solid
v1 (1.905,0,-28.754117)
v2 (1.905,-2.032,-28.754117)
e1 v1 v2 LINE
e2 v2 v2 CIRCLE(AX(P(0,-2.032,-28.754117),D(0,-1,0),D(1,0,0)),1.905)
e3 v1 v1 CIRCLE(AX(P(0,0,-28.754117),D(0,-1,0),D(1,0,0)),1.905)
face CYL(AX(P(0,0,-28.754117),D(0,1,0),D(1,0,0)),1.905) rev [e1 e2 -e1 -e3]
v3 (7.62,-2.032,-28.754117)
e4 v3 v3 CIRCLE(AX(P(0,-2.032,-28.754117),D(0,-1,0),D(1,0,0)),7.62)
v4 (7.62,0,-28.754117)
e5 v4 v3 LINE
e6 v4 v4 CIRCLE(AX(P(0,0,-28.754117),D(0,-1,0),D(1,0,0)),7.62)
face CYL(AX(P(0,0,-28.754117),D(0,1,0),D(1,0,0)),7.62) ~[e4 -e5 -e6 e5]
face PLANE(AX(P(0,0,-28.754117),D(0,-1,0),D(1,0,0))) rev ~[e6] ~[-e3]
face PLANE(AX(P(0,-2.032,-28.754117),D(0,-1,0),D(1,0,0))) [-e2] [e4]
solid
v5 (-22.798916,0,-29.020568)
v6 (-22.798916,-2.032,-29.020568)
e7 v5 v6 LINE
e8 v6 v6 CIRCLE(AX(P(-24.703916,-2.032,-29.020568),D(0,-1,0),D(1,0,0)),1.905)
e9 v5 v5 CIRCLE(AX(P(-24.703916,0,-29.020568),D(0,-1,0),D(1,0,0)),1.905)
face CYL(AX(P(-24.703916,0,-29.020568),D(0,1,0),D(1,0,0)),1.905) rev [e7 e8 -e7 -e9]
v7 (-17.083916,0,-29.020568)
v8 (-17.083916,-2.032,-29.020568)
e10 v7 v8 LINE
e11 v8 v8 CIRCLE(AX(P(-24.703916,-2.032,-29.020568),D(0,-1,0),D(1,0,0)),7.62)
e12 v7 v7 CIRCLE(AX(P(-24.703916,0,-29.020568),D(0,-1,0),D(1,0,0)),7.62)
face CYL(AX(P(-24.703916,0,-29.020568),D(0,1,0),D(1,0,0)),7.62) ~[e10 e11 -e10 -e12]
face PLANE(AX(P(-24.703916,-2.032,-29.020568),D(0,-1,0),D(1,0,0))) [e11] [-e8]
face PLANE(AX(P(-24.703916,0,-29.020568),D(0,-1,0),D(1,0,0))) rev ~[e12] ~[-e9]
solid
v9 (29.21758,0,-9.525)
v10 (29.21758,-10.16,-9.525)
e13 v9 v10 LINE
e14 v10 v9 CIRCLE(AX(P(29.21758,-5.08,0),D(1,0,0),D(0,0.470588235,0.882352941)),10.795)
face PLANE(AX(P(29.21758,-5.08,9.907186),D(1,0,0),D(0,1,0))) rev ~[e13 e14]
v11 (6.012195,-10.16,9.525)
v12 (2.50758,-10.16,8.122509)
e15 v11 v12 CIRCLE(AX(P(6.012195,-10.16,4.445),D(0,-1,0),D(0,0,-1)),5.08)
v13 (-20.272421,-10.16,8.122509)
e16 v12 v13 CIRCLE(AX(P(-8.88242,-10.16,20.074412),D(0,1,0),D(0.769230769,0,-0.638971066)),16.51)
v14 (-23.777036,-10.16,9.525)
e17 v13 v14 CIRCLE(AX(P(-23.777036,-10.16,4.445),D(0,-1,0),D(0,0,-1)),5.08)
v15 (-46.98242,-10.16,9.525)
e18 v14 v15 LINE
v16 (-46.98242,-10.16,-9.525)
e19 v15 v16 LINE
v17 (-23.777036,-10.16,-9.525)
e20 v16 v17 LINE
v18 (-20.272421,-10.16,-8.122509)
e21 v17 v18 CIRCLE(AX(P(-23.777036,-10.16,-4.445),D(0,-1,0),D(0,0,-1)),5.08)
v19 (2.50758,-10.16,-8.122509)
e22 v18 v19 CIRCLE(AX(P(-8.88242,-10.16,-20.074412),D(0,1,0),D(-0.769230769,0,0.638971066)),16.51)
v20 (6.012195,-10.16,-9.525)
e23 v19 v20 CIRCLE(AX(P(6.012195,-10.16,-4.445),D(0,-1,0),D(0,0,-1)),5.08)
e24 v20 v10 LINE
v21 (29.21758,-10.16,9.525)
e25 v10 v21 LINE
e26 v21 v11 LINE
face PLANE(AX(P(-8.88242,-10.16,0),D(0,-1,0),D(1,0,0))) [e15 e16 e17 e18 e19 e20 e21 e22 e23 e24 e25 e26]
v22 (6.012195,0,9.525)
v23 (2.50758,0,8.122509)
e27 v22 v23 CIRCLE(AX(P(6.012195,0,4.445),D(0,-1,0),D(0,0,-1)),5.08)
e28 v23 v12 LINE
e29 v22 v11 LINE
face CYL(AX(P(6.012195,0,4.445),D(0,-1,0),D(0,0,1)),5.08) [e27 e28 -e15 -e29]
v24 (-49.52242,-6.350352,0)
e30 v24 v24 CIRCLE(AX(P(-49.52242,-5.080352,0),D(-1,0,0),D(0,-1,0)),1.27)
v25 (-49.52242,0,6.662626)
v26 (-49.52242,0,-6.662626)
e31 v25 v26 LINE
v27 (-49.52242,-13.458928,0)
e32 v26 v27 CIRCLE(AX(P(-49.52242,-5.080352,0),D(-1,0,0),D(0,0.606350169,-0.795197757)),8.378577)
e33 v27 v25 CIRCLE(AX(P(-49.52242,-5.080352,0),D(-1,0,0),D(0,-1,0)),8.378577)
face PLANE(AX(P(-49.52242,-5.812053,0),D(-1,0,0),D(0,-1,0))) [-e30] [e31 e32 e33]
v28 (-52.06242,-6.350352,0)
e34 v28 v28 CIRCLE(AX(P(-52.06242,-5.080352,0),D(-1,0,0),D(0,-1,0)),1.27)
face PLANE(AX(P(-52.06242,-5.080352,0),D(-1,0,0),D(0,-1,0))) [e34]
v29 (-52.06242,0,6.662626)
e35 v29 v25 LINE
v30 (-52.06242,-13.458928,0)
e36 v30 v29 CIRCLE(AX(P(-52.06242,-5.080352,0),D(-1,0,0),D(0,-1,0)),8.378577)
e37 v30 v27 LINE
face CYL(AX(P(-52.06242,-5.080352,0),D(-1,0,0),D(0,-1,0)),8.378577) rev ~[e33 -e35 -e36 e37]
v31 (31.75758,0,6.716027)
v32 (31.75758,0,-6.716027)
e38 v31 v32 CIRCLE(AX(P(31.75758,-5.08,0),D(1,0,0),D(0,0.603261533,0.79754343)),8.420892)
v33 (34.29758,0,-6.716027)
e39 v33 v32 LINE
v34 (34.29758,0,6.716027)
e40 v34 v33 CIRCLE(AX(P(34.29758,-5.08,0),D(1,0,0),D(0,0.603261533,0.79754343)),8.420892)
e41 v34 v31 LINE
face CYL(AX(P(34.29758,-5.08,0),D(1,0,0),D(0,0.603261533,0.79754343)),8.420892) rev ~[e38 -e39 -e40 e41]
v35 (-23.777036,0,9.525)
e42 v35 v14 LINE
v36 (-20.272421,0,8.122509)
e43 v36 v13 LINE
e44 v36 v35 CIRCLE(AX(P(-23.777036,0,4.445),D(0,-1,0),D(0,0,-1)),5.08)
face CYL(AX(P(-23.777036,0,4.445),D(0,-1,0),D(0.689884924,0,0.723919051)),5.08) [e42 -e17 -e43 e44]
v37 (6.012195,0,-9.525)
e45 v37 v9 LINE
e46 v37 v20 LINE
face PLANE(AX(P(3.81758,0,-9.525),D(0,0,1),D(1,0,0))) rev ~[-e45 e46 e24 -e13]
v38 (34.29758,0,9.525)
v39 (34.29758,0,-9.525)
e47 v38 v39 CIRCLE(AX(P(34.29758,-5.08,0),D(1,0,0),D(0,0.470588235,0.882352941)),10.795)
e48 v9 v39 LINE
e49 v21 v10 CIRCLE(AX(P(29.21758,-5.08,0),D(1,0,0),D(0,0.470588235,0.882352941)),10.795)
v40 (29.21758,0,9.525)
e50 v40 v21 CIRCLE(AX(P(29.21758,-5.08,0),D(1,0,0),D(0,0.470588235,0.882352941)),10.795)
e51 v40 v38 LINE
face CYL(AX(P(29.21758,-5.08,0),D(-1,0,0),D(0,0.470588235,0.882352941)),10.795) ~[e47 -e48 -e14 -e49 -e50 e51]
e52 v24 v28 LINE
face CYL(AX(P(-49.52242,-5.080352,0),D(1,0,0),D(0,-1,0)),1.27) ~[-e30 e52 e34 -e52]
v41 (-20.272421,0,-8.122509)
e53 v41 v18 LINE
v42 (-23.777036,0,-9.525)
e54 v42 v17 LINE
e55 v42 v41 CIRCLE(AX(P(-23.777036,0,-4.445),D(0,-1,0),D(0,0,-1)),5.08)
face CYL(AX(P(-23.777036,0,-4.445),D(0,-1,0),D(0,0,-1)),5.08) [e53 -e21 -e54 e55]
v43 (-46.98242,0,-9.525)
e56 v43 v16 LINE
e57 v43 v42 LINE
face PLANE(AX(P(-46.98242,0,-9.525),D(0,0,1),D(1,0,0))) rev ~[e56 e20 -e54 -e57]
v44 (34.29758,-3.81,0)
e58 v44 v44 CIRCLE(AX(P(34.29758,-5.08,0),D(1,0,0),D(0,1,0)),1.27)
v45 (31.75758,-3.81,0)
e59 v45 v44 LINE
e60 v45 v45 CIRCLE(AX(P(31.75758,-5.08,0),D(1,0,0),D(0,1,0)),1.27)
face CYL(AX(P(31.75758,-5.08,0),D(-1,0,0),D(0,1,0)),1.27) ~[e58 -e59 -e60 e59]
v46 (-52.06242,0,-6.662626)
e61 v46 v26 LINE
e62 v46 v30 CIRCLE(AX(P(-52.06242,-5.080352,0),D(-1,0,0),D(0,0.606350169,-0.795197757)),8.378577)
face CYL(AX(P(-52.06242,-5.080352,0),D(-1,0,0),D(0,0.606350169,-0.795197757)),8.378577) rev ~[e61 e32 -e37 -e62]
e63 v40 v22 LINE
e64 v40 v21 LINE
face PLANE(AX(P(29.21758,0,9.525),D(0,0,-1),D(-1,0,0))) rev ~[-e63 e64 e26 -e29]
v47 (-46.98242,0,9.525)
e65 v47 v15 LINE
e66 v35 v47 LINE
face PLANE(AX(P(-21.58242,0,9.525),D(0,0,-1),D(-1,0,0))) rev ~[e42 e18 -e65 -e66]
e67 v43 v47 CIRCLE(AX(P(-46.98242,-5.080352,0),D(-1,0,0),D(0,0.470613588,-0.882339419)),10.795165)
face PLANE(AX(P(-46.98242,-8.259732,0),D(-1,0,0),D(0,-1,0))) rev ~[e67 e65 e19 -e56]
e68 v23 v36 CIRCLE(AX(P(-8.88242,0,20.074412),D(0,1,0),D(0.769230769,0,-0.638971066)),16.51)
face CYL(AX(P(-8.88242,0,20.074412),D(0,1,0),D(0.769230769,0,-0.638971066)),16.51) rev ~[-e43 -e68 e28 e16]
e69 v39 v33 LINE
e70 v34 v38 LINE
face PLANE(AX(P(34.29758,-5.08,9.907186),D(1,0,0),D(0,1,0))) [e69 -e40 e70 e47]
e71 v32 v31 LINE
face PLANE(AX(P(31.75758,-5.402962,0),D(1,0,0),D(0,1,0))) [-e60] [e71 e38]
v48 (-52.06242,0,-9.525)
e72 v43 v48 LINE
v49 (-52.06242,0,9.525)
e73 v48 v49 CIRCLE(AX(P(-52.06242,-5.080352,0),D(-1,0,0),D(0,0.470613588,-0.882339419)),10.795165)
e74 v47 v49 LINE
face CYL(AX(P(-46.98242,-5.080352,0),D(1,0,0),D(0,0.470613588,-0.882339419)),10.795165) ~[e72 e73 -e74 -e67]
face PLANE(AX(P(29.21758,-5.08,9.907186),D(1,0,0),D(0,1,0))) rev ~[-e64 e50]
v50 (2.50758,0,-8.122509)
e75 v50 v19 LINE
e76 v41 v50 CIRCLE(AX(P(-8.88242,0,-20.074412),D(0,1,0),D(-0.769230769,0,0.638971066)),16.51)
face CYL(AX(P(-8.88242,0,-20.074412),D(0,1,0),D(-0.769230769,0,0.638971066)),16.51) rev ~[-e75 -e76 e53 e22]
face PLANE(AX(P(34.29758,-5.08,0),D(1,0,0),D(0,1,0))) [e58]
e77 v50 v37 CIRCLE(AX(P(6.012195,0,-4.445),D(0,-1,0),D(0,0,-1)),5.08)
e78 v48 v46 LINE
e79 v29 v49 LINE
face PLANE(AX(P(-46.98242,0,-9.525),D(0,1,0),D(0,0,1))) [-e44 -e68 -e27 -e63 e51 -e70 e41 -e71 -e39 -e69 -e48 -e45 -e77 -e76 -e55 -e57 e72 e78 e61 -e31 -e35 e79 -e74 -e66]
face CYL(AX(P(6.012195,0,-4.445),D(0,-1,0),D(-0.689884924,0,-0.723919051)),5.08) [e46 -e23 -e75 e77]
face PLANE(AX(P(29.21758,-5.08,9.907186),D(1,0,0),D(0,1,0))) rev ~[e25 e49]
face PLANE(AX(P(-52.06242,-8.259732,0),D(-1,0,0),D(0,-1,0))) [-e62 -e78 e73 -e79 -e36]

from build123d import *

# Parameters (mm, degrees)
F1_DEPTH  = 10.16
F2_W      = 10.16
F2_H      = 19.05
F3_DEPTH  = 5.08
F5_DEPTH  = 2.54
F6_W      = 10.16
F6_H      = 19.05
F7_DEPTH  = 5.08
F9_DEPTH  = 2.54
F10_R     = 1.27
F11_DEPTH = 2.54
F12_R     = 1.27
F13_DEPTH = 2.54
F14_R     = 7.62
F14_R_2   = 1.905
F15_DEPTH = 2.032
F16_R     = 5.08


with BuildPart() as f1:
    # F0 (on Front) → F1 (new body)
    with BuildSketch(Plane.XZ):
        with BuildLine():
            Line((-21.5824204445, 9.525), (-46.9824204445, 9.525))
            Line((-46.9824204445, 9.525), (-46.9824204445, -9.525))
            Line((-46.9824204445, -9.525), (-21.5824204445, -9.525))
            ThreePointArc((-21.5824204445, -9.525), (-8.8824204445, -3.5644123059), (3.8175795555, -9.525))
            Line((3.8175795555, -9.525), (29.2175795555, -9.525))
            Line((29.2175795555, -9.525), (29.2175795555, 9.525))
            Line((29.2175795555, 9.525), (3.8175795555, 9.525))
            ThreePointArc((3.8175795555, 9.525), (-8.8824204445, 3.5644123059), (-21.5824204445, 9.525))
        make_face()
    extrude(amount=F1_DEPTH)

    # F2 (on face) → F3 (join)
    with BuildSketch(Plane.YZ.offset(29.2175795555)):
        with BuildLine():
            Line((-10.16, 9.525), (0, 9.525))
            ThreePointArc((0, 9.525), (-5.08, 10.795), (-10.16, 9.525))
        make_face()
        with Locations((-5.08, 0)):
            Rectangle(F2_W, F2_H)
        with BuildLine():
            ThreePointArc((-10.16, -9.525), (-5.08, -10.795), (0, -9.525))
            Line((0, -9.525), (-10.16, -9.525))
        make_face()
        with BuildLine():
            Line((-10.16, -9.525), (-10.16, 9.525))
            ThreePointArc((-10.16, 9.525), (-15.875, 0), (-10.16, -9.525))
        make_face()
    extrude(amount=F3_DEPTH)

    # F4 (on face) → F5 (cut)
    with BuildSketch(Plane.YZ.offset(34.2975795555)):
        with BuildLine():
            Line((0, -6.7160268108), (0, 6.7160268108))
            ThreePointArc((0, 6.7160268108), (-13.5008916466, 0), (0, -6.7160268108))
        make_face()
    extrude(amount=-F5_DEPTH, mode=Mode.SUBTRACT)

    # F6 (on face) → F7 (join)
    with BuildSketch(Plane(origin=(-46.9824204445, 0, 0), x_dir=(0, -1, 0), z_dir=(-1, 0, 0))):
        with BuildLine():
            Line((10.16, -9.525), (0, -9.525))
            ThreePointArc((0, -9.525), (15.8755169753, 0), (0, 9.525))
            Line((0, 9.525), (10.16, 9.525))
            Line((10.16, 9.525), (10.16, -9.525))
        make_face()
        with Locations((5.08, 0)):
            Rectangle(F6_W, F6_H)
    extrude(amount=F7_DEPTH)

    # F8 (on face) → F9 (cut)
    with BuildSketch(Plane(origin=(-52.0624204445, 0, 0), x_dir=(0, -1, 0), z_dir=(-1, 0, 0))):
        with BuildLine():
            ThreePointArc((0, -6.6626255848), (8.7975033543, -7.5088836617), (13.4589284751, 0))
            ThreePointArc((13.4589284751, 0), (8.7975033543, 7.5088836617), (0, 6.6626255848))
            Line((0, 6.6626255848), (0, -6.6626255848))
        make_face()
    extrude(amount=-F9_DEPTH, mode=Mode.SUBTRACT)

    # F10 (on face) → F11 (join)
    with BuildSketch(Plane.YZ.offset(31.7575795555)):
        with Locations((-5.08, 0)):
            Circle(F10_R)
    extrude(amount=F11_DEPTH)

    # F12 (on face) → F13 (join)
    with BuildSketch(Plane(origin=(-49.5224204445, 0, 0), x_dir=(0, -1, 0), z_dir=(-1, 0, 0))):
        with Locations((5.0803515401, 0)):
            Circle(F12_R)
    extrude(amount=F13_DEPTH)

    # F16
    f16_edges = [f1.edges().sort_by_distance(p)[0] for p in [
        (-21.58242, -5.08, 9.525),
        (3.81758, -5.08, 9.525),
        (3.81758, -5.08, -9.525),
        (-21.58242, -5.08, -9.525),
    ]]
    fillet(f16_edges, radius=F16_R)


with BuildPart() as f15:
    # F14 (on Front) → F15 (new body)
    with BuildSketch(Plane.XZ):
        with Locations((0, -28.7541169673)):
            Circle(F14_R)
        with Locations((0, -28.7541169673)):
            Circle(F14_R_2, mode=Mode.SUBTRACT)
    extrude(amount=F15_DEPTH)


with BuildPart() as f15b:
    # F14 (on Front) → F15, piece 2 (new body)
    with BuildSketch(Plane.XZ):
        with Locations((-24.7039161623, -29.0205683559)):
            Circle(F14_R)
        with Locations((-24.7039161623, -29.0205683559)):
            Circle(F14_R_2, mode=Mode.SUBTRACT)
    extrude(amount=F15_DEPTH)


solid = Compound([f1.part, f15.part, f15b.part])
